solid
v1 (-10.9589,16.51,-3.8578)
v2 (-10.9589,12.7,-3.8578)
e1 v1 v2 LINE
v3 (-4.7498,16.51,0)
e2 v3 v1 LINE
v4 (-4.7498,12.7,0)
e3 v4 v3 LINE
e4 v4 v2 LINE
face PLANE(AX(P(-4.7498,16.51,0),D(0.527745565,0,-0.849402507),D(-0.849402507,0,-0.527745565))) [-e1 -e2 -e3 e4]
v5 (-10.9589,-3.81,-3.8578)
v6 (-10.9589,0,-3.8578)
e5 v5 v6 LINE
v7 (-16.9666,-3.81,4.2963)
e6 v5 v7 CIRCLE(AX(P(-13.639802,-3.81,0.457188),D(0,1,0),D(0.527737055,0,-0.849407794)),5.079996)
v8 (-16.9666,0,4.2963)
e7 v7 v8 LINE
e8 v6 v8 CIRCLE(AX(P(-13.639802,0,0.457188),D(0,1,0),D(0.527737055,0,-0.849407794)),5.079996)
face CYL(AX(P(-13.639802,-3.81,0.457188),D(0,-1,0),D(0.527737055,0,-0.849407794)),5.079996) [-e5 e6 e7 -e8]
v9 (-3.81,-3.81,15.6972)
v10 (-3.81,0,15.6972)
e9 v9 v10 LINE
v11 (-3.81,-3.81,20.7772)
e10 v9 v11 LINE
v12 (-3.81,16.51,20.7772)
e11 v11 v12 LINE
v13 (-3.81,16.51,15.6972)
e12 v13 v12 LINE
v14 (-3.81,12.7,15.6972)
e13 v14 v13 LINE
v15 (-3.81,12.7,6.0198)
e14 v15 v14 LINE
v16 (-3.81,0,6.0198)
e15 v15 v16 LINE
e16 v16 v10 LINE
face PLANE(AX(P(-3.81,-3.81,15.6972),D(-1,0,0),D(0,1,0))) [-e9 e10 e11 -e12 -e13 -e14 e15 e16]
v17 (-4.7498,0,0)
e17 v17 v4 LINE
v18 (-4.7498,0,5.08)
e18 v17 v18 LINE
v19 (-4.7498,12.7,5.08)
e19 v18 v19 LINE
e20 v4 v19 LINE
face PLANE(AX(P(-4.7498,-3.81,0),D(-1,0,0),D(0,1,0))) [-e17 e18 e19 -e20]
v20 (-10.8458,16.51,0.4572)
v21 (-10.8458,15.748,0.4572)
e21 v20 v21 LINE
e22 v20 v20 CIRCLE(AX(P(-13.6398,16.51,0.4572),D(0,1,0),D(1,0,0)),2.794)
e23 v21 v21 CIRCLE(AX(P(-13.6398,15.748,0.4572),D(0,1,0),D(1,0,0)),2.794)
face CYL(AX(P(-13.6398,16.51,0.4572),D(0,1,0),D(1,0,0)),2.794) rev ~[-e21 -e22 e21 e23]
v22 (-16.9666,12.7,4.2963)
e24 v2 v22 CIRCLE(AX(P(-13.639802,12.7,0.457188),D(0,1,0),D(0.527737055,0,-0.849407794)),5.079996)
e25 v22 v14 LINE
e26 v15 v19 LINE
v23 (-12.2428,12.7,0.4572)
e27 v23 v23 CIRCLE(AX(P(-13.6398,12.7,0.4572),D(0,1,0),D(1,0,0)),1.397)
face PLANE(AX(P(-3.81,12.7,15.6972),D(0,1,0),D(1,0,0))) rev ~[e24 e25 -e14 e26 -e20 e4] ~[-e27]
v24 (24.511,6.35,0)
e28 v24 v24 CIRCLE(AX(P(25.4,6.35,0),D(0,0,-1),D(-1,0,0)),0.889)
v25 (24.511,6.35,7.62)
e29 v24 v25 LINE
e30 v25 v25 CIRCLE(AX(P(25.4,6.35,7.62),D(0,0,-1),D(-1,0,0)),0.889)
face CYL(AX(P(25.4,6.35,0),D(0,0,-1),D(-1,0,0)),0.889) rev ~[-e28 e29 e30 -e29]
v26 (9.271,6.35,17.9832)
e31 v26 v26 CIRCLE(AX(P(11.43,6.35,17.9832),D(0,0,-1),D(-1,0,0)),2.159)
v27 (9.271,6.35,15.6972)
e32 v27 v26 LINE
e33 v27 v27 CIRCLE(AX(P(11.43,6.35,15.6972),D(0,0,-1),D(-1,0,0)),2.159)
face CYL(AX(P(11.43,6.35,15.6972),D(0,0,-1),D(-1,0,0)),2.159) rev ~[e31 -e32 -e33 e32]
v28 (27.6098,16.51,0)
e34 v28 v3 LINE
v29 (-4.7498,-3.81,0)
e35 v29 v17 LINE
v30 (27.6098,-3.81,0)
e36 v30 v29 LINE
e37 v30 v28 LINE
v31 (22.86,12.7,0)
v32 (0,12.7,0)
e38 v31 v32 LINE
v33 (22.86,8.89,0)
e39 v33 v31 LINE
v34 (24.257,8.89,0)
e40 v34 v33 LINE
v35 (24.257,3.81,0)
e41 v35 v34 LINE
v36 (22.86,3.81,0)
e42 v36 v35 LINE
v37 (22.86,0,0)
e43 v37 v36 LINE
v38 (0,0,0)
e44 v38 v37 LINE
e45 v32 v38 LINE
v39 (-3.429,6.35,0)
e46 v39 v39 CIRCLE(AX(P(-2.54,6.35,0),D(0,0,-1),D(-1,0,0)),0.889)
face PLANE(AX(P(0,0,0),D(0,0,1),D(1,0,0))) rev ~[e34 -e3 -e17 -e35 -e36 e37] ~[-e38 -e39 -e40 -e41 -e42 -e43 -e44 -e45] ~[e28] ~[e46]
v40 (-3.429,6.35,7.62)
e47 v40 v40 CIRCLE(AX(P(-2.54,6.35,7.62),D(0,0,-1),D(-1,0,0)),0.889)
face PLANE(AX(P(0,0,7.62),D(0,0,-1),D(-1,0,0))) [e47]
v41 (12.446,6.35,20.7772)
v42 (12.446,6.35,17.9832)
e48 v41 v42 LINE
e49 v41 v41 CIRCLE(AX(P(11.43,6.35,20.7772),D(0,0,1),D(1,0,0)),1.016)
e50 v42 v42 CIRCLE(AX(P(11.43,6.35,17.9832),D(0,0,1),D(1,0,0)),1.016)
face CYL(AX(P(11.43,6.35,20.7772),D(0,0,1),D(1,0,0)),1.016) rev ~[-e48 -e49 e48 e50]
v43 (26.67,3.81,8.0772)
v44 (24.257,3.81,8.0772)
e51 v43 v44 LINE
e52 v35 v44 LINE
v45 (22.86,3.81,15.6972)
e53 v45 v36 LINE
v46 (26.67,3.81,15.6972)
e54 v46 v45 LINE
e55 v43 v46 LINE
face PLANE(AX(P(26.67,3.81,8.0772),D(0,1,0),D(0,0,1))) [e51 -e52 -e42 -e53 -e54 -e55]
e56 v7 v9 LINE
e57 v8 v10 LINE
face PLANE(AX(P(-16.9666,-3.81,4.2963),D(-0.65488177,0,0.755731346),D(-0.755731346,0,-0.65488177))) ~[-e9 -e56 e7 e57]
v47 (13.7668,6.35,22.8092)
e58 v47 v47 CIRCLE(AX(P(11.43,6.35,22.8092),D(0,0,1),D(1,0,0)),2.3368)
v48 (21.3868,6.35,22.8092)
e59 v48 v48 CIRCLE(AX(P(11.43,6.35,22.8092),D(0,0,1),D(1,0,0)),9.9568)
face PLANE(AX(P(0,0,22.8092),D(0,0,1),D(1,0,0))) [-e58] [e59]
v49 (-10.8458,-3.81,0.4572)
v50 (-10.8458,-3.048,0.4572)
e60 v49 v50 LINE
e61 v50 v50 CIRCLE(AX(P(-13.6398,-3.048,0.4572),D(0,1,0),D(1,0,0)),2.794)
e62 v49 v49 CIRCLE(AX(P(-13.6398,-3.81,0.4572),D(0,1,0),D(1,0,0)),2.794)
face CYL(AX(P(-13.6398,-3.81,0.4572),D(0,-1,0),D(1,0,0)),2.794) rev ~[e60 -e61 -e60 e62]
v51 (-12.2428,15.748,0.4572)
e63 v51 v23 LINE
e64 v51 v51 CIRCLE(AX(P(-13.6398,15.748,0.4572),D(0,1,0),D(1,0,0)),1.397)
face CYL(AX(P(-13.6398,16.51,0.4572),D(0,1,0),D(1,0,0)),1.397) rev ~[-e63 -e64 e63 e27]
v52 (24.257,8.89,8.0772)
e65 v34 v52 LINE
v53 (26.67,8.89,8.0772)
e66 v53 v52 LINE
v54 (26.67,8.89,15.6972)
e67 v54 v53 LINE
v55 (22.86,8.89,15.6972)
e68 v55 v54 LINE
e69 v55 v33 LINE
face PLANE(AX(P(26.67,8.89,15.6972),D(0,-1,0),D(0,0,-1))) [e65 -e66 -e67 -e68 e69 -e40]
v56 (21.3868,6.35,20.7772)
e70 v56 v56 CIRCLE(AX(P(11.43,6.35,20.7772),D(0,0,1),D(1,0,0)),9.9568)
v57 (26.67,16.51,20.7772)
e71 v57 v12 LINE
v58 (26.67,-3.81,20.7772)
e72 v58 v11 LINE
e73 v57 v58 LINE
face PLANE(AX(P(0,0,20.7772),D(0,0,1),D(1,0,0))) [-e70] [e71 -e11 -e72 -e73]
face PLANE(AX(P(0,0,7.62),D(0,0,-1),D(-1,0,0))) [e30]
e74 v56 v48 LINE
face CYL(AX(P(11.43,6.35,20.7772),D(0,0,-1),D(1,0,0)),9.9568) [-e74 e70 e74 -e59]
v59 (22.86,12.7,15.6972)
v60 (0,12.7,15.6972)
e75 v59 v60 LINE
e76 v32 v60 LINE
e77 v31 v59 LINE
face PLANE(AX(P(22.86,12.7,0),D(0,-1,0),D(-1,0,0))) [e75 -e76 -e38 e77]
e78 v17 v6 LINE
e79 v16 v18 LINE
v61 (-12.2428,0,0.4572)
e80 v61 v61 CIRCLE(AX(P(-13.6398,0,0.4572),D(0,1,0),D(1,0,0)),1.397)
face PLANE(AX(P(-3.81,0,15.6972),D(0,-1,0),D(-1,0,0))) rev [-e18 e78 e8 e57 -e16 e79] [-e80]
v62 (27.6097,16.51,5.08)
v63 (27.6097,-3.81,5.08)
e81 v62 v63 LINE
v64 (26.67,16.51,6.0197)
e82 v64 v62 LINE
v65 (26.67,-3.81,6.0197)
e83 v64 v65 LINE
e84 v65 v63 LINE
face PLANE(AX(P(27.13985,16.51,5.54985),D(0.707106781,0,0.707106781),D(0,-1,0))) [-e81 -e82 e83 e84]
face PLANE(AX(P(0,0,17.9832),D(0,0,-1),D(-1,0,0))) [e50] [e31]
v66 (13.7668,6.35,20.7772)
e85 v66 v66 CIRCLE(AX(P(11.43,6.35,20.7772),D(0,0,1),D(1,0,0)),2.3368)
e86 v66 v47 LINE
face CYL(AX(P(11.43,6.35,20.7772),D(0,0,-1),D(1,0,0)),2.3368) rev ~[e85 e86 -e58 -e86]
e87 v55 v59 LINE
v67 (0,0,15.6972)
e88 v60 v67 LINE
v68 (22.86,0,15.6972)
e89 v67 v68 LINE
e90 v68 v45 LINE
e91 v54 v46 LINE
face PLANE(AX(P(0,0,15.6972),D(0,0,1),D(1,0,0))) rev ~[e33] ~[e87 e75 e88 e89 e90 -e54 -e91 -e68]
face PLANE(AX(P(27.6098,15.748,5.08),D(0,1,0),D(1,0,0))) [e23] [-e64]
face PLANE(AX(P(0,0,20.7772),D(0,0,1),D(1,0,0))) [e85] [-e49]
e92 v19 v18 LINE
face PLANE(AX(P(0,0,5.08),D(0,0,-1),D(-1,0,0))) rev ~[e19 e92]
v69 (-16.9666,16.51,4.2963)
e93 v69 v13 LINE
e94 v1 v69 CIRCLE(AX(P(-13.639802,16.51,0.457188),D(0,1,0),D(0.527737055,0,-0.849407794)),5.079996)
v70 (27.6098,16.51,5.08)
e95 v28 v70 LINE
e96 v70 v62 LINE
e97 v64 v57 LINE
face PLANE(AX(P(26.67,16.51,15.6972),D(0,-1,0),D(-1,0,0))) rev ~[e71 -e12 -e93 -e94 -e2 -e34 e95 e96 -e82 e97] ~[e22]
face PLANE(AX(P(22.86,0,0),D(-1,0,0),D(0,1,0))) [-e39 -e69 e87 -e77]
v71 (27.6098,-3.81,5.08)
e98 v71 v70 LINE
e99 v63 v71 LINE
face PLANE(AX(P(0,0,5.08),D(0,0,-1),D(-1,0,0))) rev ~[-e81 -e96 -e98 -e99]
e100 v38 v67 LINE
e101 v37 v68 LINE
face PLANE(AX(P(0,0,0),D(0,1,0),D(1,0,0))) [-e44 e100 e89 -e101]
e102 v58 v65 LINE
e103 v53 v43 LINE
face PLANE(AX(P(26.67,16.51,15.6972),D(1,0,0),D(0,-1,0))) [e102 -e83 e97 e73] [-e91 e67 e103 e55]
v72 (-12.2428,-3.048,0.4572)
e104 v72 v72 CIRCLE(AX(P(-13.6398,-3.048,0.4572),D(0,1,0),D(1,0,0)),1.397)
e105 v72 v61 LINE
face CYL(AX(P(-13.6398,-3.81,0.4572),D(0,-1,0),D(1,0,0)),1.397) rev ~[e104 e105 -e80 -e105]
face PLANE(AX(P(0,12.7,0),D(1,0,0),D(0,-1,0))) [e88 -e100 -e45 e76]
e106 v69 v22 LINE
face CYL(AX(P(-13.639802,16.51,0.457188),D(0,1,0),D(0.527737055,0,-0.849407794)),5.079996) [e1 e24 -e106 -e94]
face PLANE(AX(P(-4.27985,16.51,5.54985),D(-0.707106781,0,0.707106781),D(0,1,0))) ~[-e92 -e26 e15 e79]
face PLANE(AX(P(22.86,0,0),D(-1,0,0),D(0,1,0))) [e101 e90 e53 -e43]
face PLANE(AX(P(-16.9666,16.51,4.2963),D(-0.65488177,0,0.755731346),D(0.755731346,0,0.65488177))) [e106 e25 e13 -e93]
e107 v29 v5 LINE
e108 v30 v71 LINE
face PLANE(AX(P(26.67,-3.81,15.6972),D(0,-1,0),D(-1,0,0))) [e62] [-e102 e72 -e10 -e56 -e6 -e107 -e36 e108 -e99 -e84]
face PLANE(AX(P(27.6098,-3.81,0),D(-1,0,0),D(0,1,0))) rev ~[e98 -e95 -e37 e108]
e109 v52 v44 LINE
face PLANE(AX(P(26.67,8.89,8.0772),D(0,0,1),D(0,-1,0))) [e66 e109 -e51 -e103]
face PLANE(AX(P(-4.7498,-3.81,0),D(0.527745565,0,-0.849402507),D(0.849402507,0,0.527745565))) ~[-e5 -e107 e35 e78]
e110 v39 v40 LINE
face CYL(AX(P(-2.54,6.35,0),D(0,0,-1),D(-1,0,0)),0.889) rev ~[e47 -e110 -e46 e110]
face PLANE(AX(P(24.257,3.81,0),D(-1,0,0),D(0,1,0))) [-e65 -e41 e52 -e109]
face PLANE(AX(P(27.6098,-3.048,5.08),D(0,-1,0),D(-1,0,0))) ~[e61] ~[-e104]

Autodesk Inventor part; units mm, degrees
ref_plane "YZ Plane" through (0, 0, 0) normal (1, 0, 0) x (0, 1, 0)
sketch "Sketch1" plane through (0, 0, 0) normal (0, 0, 1) x (1, 0, 0)
  line L0 (0, 0) -> (22.86, 0)
  line L1 (22.86, 0) -> (22.86, 12.7)
  line L2 (22.86, 12.7) -> (0, 12.7)
  line L3 (0, 12.7) -> (0, 0)
  line L4 (-3.81, 16.51) -> (26.67, 16.51)
  line L5 (26.67, 16.51) -> (26.67, -3.81)
  line L6 (26.67, -3.81) -> (-3.81, -3.81)
  line L7 (-3.81, -3.81) -> (-3.81, 16.51)
  dimension "d0" = 22.86
  dimension "d1" = 12.7
  dimension "d2" = 20.32
extrude "Extrusion1" add sketch "Sketch1" along normal blind 15.6972
sketch "Sketch2" plane through (26.67, -3.81, 0) normal (1, 0, 0) x (0, 0, -1)
  line L0 (-15.6972, 16.51) -> (-15.6972, 3.81) projected
  line L1 (-15.6972, 12.7) -> (-8.0772, 12.7)
  line L2 (-8.0772, 12.7) -> (-8.0772, 7.62)
  line L3 (-8.0772, 7.62) -> (-15.6972, 7.62)
  line L4 (-15.6972, 7.62) -> (-15.6972, 12.7)
  line L5 (0, 0) -> (0, 20.32) projected
  point P0 (0, 3.81)
  point P1 (-8.0772, 10.16)
  point P2 (0, 10.16)
  dimension "d5" = 5.08
  dimension "d6" = 7.62
extrude "Extrusion2" cut sketch "Sketch2" against normal up to surface (3.81 mm away)
sketch "Sketch3" plane through (0, 0, 0) normal (0, 0, -1) x (-1, 0, 0)
  line L0 (3.81, -3.81) -> (-26.67, -3.81) projected
  line L1 (3.81, -3.81) -> (4.7498, -3.81)
  line L2 (4.7498, -3.81) -> (4.7498, 16.51)
  line L3 (4.7498, 16.51) -> (3.81, 16.51)
  line L4 (3.81, 16.51) -> (3.81, -3.81)
  line L5 (0, 0) -> (0, 12.7) projected
  line L6 (-26.67, -3.81) -> (-27.6098, -3.81)
  line L7 (-27.6098, -3.81) -> (-27.6098, 16.51)
  line L8 (-27.6098, 16.51) -> (-26.67, 16.51)
  line L9 (-26.67, 16.51) -> (-26.67, -3.81)
  line L10 (-22.86, 12.7) -> (-22.86, 0) projected
  dimension "d9" = 4.7498
  dimension "d18" = 4.7498
extrude "Extrusion3" add sketch "Sketch3" against normal blind 5.08
chamfer "Chamfer1" distance 0.9398 angle 45 2 edges at (-3.81, 6.35, 5.08) (26.67, 6.35, 5.08)
sketch "Sketch4" plane through (0, 0, 0) normal (0, 0, -1) x (-1, 0, 0)
  circle A0 centre (2.54, 6.35) radius 0.889
  line L0 (4.7498, -3.81) -> (3.81, -3.81) construction
  line L1 (0, 0) -> (4.7498, 0) construction
  line L2 (4.7498, 0) -> (4.7498, -3.81) construction
  line L3 (4.7498, -3.81) -> (0, -3.81) construction
  line L4 (0, -3.81) -> (0, 0) construction
  line L5 (4.7498, -3.81) -> (4.7498, 16.51) projected
  line L6 (-22.86, 0) -> (0, 0) projected
  line L7 (-11.43, 0) -> (-11.43, 12.7) construction
  line L8 (0, 12.7) -> (-22.86, 12.7) projected
  circle A1 centre (-25.4, 6.35) radius 0.889
  point P0 (2.3749, -3.81)
  point P1 (4.7498, 6.35)
  dimension "d15" = 1.778
  dimension "d27" = 13.97
extrude "Extrusion4" cut sketch "Sketch4" against normal blind 7.62
ref_plane "Work Plane1" through (11.43, -3.81, 15.6972) normal (-1, 0, 0) x (0, 0, 1)
sketch "Sketch5" plane through (-3.81, 16.51, 15.6972) normal (0, 1, 0) x (1, 0, 0)
  line L0 (0, 0) -> (30.48, 0) projected
  line L1 (-0.9398, 15.6972) -> (-0.9398, 10.6172) projected
  line L2 (0, 9.6774) -> (-0.9398, 10.6172) projected
  line L3 (0, 9.6774) -> (0, 0) projected
  line L4 (-0.9398, 15.6972) -> (31.4198, 15.6972) projected
  line L5 (-0.9398, 15.6972) -> (-7.1489, 19.555)
  line L6 (-13.1566, 11.4009) -> (0, 0)
  arc A0 (-7.1489, 19.555) -> (-13.1566, 11.4009) centre (-9.8298, 15.24) ccw
  circle A1 centre (-9.8298, 15.24) radius 1.397
  line L7 (-0.9398, 10.6172) -> (0, 9.6774) projected
  point P0 (3.81, 15.6972)
  dimension "d24" = 5.08
  dimension "d25" = 8.89
  dimension "d26" = 2.794
  dimension "d42" = 15.24
extrude "Extrusion5" add sketch "Sketch5" against normal blind 3.81
ref_plane "Work Plane2" through (26.67, 6.35, 15.6972) normal (0, 1, 0) x (1, 0, 0)
mirror "Mirror1" about plane through (26.67, 6.35, 15.6972) normal (0, 1, 0) of "Extrusion5"
sketch "Sketch6" plane through (27.6098, 16.51, 5.08) normal (0, 1, 0) x (1, 0, 0)
  circle A0 centre (-41.2496, 4.6228) radius 1.397 projected
  circle A1 centre (-41.2496, 4.6228) radius 2.794
  point P0 (-27.6098, 5.08)
  dimension "d29" = 5.588
extrude "Extrusion6" cut sketch "Sketch6" against normal blind 0.762
mirror "Mirror2" about plane through (26.67, 6.35, 15.6972) normal (0, 1, 0) of "Extrusion6"
sketch "Sketch9" plane through (0, 0, 0) normal (0, 0, -1) x (-1, 0, 0)
  line L0 (-22.86, 12.7) -> (-22.86, 0) projected
  line L1 (-22.86, 3.81) -> (-24.257, 3.81)
  line L2 (-24.257, 3.81) -> (-24.257, 8.89)
  line L3 (-24.257, 8.89) -> (-22.86, 8.89)
  line L4 (-22.86, 8.89) -> (-22.86, 3.81)
  point P0 (0, 0)
  point P1 (-22.86, 6.35)
  dimension "d37" = 5.08
  dimension "d38" = 1.397
  dimension "d39" = 2.54
extrude "Extrusion9" cut sketch "Sketch9" against normal blind 22.225
sketch "Sketch10" plane through (0, 0, 15.6972) normal (0, 0, 1) x (1, 0, 0)
  line L0 (26.67, 16.51) -> (-3.81, 16.51)
  line L1 (26.67, -3.81) -> (27.6098, -3.81) projected
  line L2 (-3.81, 16.51) -> (26.67, 16.51)
  line L3 (26.67, 16.51) -> (26.67, -3.81)
  line L4 (26.67, -3.81) -> (-3.81, -3.81)
  line L5 (-3.81, -3.81) -> (-3.81, 16.51)
  point P0 (0, 0)
extrude "Extrusion10" add sketch "Sketch10" along normal blind 5.08
sketch "Sketch11" plane through (0, 0, 20.7772) normal (0, 0, 1) x (1, 0, 0)
  circle A0 centre (11.43, 6.35) radius 1.016
  line L0 (-3.81, -3.81) -> (26.67, -3.81) projected
  line L1 (26.67, -3.81) -> (26.67, 16.51) projected
  line L2 (26.67, 16.51) -> (-3.81, 16.51) projected
  line L3 (-3.81, 16.51) -> (-3.81, -3.81) projected
  circle A1 centre (11.43, 6.35) radius 2.3368
  circle A2 centre (11.43, 6.35) radius 9.9568
  point P0 (0, 0)
  point P1 (26.67, 6.35)
  point P2 (11.43, 16.51)
  dimension "d45" = 2.032
  dimension "d46" = 4.6736
  dimension "d47" = 7.62
extrude "Extrusion11" add sketch "Sketch11" along normal blind 2.032 contours A2
extrude "Extrusion12" cut sketch "Sketch11" against normal blind 8.5725 contours A0
sketch "Sketch12" plane through (0, 0, 15.6972) normal (0, 0, -1) x (-1, 0, 0)
  circle A0 centre (-11.43, 6.35) radius 1.016 projected
  circle A1 centre (-11.43, 6.35) radius 2.159
  point P0 (0, 0)
  dimension "d52" = 4.318
extrude "Extrusion13" cut sketch "Sketch12" against normal blind 2.286
equation "\"d18\" = d9"
equation "\"d39\" = 0.5 * d37"
properties part number "Servo Base Thumb"
